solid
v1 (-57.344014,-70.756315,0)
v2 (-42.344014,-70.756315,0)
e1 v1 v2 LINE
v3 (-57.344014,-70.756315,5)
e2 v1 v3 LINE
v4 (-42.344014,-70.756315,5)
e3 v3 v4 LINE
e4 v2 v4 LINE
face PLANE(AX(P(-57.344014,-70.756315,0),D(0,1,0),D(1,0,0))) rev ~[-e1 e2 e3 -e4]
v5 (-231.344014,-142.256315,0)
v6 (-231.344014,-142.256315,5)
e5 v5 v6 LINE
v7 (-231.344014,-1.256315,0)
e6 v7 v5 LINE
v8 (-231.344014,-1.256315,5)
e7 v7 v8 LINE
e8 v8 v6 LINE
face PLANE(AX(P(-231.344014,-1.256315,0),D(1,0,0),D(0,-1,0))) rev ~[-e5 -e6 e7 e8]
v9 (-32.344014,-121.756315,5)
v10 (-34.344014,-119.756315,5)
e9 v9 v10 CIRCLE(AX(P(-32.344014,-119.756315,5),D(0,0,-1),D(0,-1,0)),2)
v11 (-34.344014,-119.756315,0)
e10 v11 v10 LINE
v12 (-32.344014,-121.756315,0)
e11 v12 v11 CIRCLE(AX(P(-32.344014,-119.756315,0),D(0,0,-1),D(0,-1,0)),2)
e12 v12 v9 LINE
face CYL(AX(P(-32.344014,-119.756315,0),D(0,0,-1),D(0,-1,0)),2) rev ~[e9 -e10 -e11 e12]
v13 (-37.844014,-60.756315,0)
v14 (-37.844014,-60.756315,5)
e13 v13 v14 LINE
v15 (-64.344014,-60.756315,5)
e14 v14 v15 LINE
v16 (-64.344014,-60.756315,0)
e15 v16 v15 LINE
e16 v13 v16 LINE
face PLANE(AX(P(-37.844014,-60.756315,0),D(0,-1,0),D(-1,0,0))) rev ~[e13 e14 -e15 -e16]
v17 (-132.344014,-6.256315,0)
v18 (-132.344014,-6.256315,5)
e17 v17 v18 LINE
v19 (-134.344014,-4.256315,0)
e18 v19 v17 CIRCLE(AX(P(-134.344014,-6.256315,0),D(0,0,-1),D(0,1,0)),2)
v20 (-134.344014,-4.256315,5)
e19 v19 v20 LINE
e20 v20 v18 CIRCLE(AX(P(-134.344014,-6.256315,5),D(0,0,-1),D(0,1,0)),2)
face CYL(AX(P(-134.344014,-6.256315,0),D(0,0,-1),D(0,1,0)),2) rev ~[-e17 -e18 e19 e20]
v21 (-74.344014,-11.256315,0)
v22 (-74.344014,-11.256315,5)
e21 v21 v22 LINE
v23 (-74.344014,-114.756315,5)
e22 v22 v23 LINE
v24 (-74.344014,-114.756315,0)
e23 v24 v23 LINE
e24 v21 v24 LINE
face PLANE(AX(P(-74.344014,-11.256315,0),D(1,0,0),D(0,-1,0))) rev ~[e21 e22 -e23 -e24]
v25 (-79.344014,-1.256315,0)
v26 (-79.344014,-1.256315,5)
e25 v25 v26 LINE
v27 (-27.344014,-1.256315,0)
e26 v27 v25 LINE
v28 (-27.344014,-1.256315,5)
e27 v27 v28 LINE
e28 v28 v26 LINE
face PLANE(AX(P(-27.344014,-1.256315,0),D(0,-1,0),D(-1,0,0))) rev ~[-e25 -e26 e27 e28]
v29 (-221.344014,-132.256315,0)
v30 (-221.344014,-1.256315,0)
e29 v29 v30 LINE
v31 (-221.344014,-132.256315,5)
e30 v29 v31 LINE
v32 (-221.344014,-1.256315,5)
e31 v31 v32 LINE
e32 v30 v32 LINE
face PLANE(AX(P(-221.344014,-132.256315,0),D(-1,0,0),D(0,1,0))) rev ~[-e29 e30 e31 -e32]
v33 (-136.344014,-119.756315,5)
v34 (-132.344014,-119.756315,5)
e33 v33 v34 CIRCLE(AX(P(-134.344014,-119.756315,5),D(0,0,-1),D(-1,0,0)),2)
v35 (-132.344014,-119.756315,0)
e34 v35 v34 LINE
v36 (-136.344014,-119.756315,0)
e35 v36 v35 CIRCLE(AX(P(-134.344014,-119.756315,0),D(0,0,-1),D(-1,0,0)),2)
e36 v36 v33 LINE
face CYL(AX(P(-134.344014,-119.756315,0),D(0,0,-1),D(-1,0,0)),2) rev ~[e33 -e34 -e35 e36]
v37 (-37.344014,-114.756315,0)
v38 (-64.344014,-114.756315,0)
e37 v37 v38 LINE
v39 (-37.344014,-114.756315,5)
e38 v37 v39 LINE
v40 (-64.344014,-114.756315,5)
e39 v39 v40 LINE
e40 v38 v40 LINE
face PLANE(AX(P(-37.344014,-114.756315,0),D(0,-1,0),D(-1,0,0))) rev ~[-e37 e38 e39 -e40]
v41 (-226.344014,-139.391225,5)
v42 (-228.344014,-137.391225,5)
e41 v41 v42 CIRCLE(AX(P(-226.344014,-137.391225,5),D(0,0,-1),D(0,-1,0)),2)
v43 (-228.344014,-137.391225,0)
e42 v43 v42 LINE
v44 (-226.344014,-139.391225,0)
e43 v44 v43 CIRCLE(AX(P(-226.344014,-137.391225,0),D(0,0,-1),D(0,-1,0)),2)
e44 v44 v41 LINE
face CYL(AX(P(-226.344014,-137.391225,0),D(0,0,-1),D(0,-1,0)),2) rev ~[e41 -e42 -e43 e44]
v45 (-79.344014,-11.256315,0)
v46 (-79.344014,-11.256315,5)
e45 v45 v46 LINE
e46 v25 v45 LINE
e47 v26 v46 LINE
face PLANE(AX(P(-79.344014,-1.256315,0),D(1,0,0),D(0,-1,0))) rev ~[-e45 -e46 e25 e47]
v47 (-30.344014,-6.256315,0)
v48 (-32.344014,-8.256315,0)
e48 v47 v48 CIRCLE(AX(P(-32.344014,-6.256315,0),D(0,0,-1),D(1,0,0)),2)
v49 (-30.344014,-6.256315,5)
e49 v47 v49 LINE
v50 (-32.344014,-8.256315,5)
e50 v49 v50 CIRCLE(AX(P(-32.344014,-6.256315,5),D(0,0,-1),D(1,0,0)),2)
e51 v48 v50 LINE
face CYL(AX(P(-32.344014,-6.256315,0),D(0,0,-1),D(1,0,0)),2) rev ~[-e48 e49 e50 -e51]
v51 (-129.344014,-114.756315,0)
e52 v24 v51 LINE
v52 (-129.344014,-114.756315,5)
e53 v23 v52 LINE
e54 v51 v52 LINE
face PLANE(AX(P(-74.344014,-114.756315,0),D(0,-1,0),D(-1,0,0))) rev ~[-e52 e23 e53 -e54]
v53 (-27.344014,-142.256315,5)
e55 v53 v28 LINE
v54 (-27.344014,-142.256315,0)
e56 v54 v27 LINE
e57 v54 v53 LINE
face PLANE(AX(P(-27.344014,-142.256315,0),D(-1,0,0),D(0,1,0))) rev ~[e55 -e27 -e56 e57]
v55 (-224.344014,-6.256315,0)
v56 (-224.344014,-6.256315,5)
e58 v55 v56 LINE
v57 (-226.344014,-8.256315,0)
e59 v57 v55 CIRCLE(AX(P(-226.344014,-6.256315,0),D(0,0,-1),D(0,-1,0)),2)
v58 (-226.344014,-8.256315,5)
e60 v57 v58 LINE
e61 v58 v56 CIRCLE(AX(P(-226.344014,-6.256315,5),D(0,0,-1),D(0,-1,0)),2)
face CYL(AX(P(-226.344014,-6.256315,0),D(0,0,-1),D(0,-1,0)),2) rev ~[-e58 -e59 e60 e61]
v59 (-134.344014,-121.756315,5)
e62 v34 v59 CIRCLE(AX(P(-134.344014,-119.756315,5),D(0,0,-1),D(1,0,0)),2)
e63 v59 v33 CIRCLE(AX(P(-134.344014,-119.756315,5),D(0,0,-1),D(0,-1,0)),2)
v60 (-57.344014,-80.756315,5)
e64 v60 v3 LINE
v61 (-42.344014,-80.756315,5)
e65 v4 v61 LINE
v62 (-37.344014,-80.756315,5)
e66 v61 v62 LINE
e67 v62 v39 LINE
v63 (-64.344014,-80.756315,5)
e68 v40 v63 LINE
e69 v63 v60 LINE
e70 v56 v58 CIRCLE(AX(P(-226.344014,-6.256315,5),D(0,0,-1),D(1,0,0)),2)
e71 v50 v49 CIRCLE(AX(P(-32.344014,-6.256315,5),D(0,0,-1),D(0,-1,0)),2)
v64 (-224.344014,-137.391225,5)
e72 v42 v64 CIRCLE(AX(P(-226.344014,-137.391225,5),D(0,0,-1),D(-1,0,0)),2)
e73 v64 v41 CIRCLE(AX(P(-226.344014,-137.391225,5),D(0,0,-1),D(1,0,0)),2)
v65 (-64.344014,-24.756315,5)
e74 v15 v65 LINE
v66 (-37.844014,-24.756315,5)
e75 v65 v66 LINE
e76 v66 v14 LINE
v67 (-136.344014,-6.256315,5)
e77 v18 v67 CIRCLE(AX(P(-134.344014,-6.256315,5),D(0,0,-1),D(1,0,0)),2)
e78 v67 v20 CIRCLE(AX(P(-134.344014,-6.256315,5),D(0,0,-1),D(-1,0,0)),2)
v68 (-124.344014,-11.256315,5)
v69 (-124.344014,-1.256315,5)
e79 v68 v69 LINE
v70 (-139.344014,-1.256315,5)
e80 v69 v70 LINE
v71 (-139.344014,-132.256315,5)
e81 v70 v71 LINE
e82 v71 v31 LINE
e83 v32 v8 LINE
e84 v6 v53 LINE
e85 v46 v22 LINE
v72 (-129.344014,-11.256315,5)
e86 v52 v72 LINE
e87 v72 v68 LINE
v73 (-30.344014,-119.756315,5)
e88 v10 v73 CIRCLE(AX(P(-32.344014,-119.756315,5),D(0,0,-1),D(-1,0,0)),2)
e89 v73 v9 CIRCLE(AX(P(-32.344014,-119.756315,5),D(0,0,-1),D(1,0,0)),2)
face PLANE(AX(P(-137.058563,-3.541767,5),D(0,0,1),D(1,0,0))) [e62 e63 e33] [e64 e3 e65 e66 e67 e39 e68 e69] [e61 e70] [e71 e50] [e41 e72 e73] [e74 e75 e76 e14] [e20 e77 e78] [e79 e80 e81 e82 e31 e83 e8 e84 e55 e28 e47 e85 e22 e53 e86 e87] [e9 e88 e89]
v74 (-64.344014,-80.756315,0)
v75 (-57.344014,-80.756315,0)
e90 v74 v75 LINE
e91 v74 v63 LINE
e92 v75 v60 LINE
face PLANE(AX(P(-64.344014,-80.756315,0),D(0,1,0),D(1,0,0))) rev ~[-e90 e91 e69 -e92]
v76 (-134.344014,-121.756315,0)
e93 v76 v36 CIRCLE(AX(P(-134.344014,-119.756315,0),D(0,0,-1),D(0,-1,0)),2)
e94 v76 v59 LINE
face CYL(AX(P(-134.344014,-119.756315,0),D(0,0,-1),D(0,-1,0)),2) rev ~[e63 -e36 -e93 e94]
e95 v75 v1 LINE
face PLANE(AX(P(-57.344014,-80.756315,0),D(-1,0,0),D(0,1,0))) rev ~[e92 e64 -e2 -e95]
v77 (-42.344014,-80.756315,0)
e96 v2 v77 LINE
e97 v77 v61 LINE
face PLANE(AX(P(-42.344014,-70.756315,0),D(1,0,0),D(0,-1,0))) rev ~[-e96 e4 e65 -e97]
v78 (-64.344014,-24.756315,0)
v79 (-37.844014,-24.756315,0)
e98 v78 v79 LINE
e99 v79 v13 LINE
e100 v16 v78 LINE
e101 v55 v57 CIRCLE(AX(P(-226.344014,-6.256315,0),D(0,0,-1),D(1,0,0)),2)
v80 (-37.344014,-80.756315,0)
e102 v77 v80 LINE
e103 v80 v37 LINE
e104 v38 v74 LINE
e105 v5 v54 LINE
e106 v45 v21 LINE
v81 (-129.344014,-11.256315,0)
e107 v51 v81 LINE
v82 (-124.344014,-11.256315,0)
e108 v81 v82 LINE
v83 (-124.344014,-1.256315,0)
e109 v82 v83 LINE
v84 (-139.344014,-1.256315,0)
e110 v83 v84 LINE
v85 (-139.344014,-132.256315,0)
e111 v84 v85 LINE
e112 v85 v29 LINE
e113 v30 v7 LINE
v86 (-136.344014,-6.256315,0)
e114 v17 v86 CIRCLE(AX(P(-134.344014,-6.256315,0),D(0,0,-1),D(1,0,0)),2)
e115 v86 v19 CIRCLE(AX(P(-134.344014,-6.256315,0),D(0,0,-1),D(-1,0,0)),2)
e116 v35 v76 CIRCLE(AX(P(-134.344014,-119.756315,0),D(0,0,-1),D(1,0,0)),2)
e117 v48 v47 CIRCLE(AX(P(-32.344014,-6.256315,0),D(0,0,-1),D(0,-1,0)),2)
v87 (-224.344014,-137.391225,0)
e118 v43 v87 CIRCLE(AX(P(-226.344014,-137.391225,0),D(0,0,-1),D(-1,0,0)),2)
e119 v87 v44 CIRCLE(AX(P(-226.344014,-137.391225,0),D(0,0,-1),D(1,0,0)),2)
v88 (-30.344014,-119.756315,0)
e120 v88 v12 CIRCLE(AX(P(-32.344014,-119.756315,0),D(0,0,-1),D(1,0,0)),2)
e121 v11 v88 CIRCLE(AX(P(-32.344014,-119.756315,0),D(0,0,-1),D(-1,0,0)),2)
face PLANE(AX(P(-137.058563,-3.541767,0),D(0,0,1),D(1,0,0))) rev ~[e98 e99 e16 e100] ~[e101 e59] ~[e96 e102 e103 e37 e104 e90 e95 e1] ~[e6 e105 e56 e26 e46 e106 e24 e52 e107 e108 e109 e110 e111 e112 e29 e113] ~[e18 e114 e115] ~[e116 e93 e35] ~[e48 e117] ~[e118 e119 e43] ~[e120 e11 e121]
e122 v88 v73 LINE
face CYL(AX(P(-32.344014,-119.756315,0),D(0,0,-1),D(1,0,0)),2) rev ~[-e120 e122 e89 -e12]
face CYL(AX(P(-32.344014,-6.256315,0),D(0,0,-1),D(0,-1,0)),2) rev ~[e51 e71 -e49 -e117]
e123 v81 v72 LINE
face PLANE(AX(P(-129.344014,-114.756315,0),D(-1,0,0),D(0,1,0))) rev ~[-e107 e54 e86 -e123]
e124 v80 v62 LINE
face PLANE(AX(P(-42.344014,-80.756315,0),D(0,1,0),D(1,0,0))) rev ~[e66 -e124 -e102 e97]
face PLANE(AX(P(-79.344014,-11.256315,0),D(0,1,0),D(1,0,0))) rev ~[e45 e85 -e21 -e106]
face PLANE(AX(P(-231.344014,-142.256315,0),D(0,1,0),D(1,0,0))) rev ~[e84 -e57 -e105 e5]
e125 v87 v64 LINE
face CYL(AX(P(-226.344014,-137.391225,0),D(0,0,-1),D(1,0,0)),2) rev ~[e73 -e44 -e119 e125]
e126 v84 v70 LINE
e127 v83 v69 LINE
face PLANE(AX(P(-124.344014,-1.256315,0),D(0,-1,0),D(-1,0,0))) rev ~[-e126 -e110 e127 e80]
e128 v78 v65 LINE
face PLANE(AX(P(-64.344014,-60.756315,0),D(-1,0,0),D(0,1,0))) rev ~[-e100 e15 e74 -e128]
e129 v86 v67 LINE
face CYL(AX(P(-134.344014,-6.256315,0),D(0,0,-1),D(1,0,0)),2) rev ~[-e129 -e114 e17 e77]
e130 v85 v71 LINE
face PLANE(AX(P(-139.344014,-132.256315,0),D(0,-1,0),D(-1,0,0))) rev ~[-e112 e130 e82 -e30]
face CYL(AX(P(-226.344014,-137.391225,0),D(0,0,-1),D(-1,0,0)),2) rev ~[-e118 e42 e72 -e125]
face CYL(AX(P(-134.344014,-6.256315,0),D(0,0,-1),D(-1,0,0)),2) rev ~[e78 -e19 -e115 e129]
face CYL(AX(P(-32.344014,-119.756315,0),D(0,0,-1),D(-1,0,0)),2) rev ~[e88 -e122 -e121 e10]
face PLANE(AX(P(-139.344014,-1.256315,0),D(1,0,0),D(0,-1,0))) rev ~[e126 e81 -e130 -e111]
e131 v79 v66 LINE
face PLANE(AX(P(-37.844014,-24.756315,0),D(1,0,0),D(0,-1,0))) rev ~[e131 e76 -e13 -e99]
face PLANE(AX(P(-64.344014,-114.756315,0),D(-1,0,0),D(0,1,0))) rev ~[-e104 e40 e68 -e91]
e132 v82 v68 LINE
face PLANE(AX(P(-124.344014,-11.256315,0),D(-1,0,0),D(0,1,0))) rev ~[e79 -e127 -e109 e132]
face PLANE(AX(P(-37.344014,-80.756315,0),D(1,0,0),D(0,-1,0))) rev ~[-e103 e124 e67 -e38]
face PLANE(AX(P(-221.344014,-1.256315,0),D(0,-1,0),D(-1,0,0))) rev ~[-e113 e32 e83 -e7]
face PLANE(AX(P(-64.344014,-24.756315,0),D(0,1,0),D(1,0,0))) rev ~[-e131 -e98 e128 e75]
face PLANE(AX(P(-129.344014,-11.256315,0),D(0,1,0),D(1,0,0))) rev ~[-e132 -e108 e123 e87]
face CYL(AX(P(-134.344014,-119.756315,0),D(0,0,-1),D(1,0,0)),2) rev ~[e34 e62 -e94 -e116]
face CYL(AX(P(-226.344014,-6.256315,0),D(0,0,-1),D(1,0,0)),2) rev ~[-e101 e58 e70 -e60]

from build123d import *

# Parameters (mm, degrees)
F1_DEPTH = 5


# Not quite as in the source:
# - a feature names something its author has since deleted; it is built from what else it names


with BuildPart() as f1:
    # F0 (on Top) → F1 (new body)
    with BuildSketch(Plane.XY):
        with BuildLine():
            Line((-134.3440142274, -1.256315279), (-139.3440142274, -1.256315279))
            Line((-139.3440142274, -1.256315279), (-139.3440142274, -6.256315279))
            Line((-139.3440142274, -6.256315279), (-136.3440142274, -6.256315279))
            ThreePointArc((-136.3440142274, -6.256315279), (-135.7582277898, -4.8421017166), (-134.3440142274, -4.256315279))
            Line((-134.3440142274, -4.256315279), (-134.3440142274, -1.256315279))
        make_face()
        with BuildLine():
            Line((-129.3440142274, -1.256315279), (-134.3440142274, -1.256315279))
            Line((-134.3440142274, -1.256315279), (-134.3440142274, -4.256315279))
            ThreePointArc((-134.3440142274, -4.256315279), (-132.929800665, -4.8421017166), (-132.3440142274, -6.256315279))
            ThreePointArc((-132.3440142274, -6.256315279), (-134.3440142274, -8.256315279), (-136.3440142274, -6.256315279))
            Line((-136.3440142274, -6.256315279), (-139.3440142274, -6.256315279))
            Line((-139.3440142274, -6.256315279), (-139.3440142274, -11.256315279))
            Line((-139.3440142274, -11.256315279), (-129.3440142274, -11.256315279))
            Line((-129.3440142274, -11.256315279), (-129.3440142274, -1.256315279))
        make_face()
        with BuildLine():
            Line((-221.3440142274, -6.256315279), (-221.3440142274, -1.256315279))
            Line((-221.3440142274, -1.256315279), (-231.3440142274, -1.256315279))
            Line((-231.3440142274, -1.256315279), (-231.3440142274, -132.256315279))
            Line((-231.3440142274, -132.256315279), (-221.3440142274, -132.256315279))
            Line((-221.3440142274, -132.256315279), (-221.3440142274, -128.856315279))
            Line((-221.3440142274, -128.856315279), (-221.3440142274, -14.656315279))
            Line((-221.3440142274, -14.656315279), (-221.3440142274, -11.256315279))
            Line((-221.3440142274, -11.256315279), (-226.3440142274, -11.256315279))
            Line((-226.3440142274, -11.256315279), (-226.3440142274, -8.256315279))
            ThreePointArc((-226.3440142274, -8.256315279), (-227.7582277898, -4.8421017166), (-224.3440142274, -6.256315279))
            Line((-224.3440142274, -6.256315279), (-221.3440142274, -6.256315279))
        make_face()
        Polygon((-124.3440142274, -1.256315279), (-129.3440142274, -1.256315279), (-129.3440142274, -11.256315279), (-126.5440142274, -11.256315279), (-126.3440142274, -11.256315279), (-124.3440142274, -11.256315279), align=None)
        Polygon((-129.3440142274, -11.256315279), (-139.3440142274, -11.256315279), (-139.3440142274, -14.656315279), (-139.3440142274, -114.756315279), (-129.3440142274, -114.756315279), (-129.3440142274, -111.756315279), (-129.3440142274, -108.756315279), (-129.3440142274, -27.956315279), (-129.3440142274, -27.456315279), (-129.3440142274, -14.056315279), align=None)
        with BuildLine():
            Line((-221.3440142274, -11.256315279), (-221.3440142274, -6.256315279))
            Line((-221.3440142274, -6.256315279), (-224.3440142274, -6.256315279))
            ThreePointArc((-224.3440142274, -6.256315279), (-224.929800665, -7.6705288414), (-226.3440142274, -8.256315279))
            Line((-226.3440142274, -8.256315279), (-226.3440142274, -11.256315279))
            Line((-226.3440142274, -11.256315279), (-221.3440142274, -11.256315279))
        make_face()
        with BuildLine():
            Line((-221.3440142274, -132.256315279), (-231.3440142274, -132.256315279))
            Line((-231.3440142274, -132.256315279), (-231.3440142274, -137.3912245035))
            Line((-231.3440142274, -137.3912245035), (-228.3440142274, -137.3912245035))
            ThreePointArc((-228.3440142274, -137.3912245035), (-226.3440142274, -135.3912245035), (-224.3440142274, -137.3912245035))
            ThreePointArc((-224.3440142274, -137.3912245035), (-224.929800665, -138.8054380659), (-226.3440142274, -139.3912245035))
            Line((-226.3440142274, -139.3912245035), (-226.3440142274, -142.256315279))
            Line((-226.3440142274, -142.256315279), (-221.3440142274, -142.256315279))
            Line((-221.3440142274, -142.256315279), (-221.3440142274, -132.256315279))
        make_face()
        with BuildLine():
            Line((-129.3440142274, -114.756315279), (-139.3440142274, -114.756315279))
            Line((-139.3440142274, -114.756315279), (-139.3440142274, -119.756315279))
            Line((-139.3440142274, -119.756315279), (-136.3440142274, -119.756315279))
            ThreePointArc((-136.3440142274, -119.756315279), (-134.3440142274, -117.756315279), (-132.3440142274, -119.756315279))
            ThreePointArc((-132.3440142274, -119.756315279), (-132.929800665, -121.1705288414), (-134.3440142274, -121.756315279))
            Line((-134.3440142274, -121.756315279), (-134.3440142274, -124.756315279))
            Line((-134.3440142274, -124.756315279), (-129.3440142274, -124.756315279))
            Line((-129.3440142274, -124.756315279), (-129.3440142274, -114.756315279))
        make_face()
        Polygon((-217.9440142274, -132.256315279), (-221.3440142274, -132.256315279), (-221.3440142274, -142.256315279), (-139.3440142274, -142.256315279), (-139.4949736476, -132.256315279), (-142.7440142274, -132.256315279), (-147.4240142274, -132.256315279), (-151.4240142274, -132.256315279), align=None)
        with BuildLine():
            Line((-228.3440142274, -137.3912245035), (-231.3440142274, -137.3912245035))
            Line((-231.3440142274, -137.3912245035), (-231.3440142274, -142.256315279))
            Line((-231.3440142274, -142.256315279), (-226.3440142274, -142.256315279))
            Line((-226.3440142274, -142.256315279), (-226.3440142274, -139.3912245035))
            ThreePointArc((-226.3440142274, -139.3912245035), (-227.7582277898, -138.8054380659), (-228.3440142274, -137.3912245035))
        make_face()
        with BuildLine():
            Line((-79.3440142274, -1.256315279), (-79.3440142274, -11.256315279))
            Line((-79.3440142274, -11.256315279), (-77.3440142274, -11.256315279))
            Line((-77.3440142274, -11.256315279), (-74.3440142274, -11.256315279))
            Line((-74.3440142274, -11.256315279), (-32.3440142274, -11.256315279))
            Line((-32.3440142274, -11.256315279), (-32.3440142274, -8.256315279))
            ThreePointArc((-32.3440142274, -8.256315279), (-33.7582277898, -4.8421017166), (-30.3440142274, -6.256315279))
            Line((-30.3440142274, -6.256315279), (-27.3440142274, -6.256315279))
            Line((-27.3440142274, -6.256315279), (-27.3440142274, -1.256315279))
            Line((-27.3440142274, -1.256315279), (-79.3440142274, -1.256315279))
        make_face()
        Polygon((-126.3440142274, -114.756315279), (-129.3440142274, -114.756315279), (-129.3440142274, -124.756315279), (-74.3440142274, -124.756315279), (-74.3440142274, -114.756315279), (-77.1940142274, -114.756315279), (-77.3440142274, -114.756315279), align=None)
        with BuildLine():
            Line((-136.3440142274, -119.756315279), (-139.3440142274, -119.756315279))
            Line((-139.3440142274, -119.756315279), (-139.3440142274, -124.756315279))
            Line((-139.3440142274, -124.756315279), (-139.1930548072, -124.756315279))
            Line((-139.1930548072, -124.756315279), (-134.3440142274, -124.756315279))
            Line((-134.3440142274, -124.756315279), (-134.3440142274, -121.756315279))
            ThreePointArc((-134.3440142274, -121.756315279), (-135.7582277898, -121.1705288414), (-136.3440142274, -119.756315279))
        make_face()
        Polygon((-139.3440142274, -132.256315279), (-139.4949736476, -132.256315279), (-139.3440142274, -142.256315279), (-129.3440142274, -142.256315279), (-129.3440142274, -124.756315279), (-134.3440142274, -124.756315279), (-139.1930548072, -124.756315279), (-139.3440142274, -124.756315279), (-139.3440142274, -128.856315279), align=None)
        Polygon((-74.3440142274, -124.756315279), (-129.3440142274, -124.756315279), (-129.3440142274, -142.256315279), (-77.3440142274, -142.256315279), (-74.3440142274, -142.256315279), align=None)
        Polygon((-32.3440142274, -11.256315279), (-74.3440142274, -11.256315279), (-74.3440142274, -14.256315279), (-74.3440142274, -26.056315279), (-74.3440142274, -103.156315279), (-74.3440142274, -111.906315279), (-74.3440142274, -114.756315279), (-64.3440142274, -114.756315279), (-64.3440142274, -105.506315279), (-64.3440142274, -82.706315279), (-64.3440142274, -80.756315279), (-64.3440142274, -60.756315279), (-64.3440142274, -59.006315279), (-64.3440142274, -26.456315279), (-64.3440142274, -24.756315279), (-62.6440142274, -24.756315279), (-39.5440142274, -24.756315279), (-37.8440142274, -24.756315279), (-27.3440142274, -24.756315279), (-27.3440142274, -14.656315279), (-27.3440142274, -11.256315279), align=None)
        with BuildLine():
            Line((-27.3440142274, -11.256315279), (-27.3440142274, -6.256315279))
            Line((-27.3440142274, -6.256315279), (-30.3440142274, -6.256315279))
            ThreePointArc((-30.3440142274, -6.256315279), (-30.929800665, -7.6705288414), (-32.3440142274, -8.256315279))
            Line((-32.3440142274, -8.256315279), (-32.3440142274, -11.256315279))
            Line((-32.3440142274, -11.256315279), (-27.3440142274, -11.256315279))
        make_face()
        Polygon((-74.3440142274, -114.756315279), (-74.3440142274, -124.756315279), (-37.3440142274, -124.756315279), (-37.3440142274, -119.756315279), (-37.3440142274, -114.756315279), (-39.2940142274, -114.756315279), (-62.3940142274, -114.756315279), (-64.3440142274, -114.756315279), align=None)
        Polygon((-37.3440142274, -124.756315279), (-74.3440142274, -124.756315279), (-74.3440142274, -142.256315279), (-27.3440142274, -142.256315279), (-27.3440142274, -124.756315279), (-32.3440142274, -124.756315279), align=None)
        with BuildLine():
            Line((-37.3440142274, -119.756315279), (-37.3440142274, -124.756315279))
            Line((-37.3440142274, -124.756315279), (-32.3440142274, -124.756315279))
            Line((-32.3440142274, -124.756315279), (-32.3440142274, -121.756315279))
            ThreePointArc((-32.3440142274, -121.756315279), (-33.7582277898, -121.1705288414), (-34.3440142274, -119.756315279))
            Line((-34.3440142274, -119.756315279), (-37.3440142274, -119.756315279))
        make_face()
        with BuildLine():
            Line((-32.3440142274, -121.756315279), (-32.3440142274, -124.756315279))
            Line((-32.3440142274, -124.756315279), (-27.3440142274, -124.756315279))
            Line((-27.3440142274, -124.756315279), (-27.3440142274, -114.756315279))
            Line((-27.3440142274, -114.756315279), (-37.3440142274, -114.756315279))
            Line((-37.3440142274, -114.756315279), (-37.3440142274, -119.756315279))
            Line((-37.3440142274, -119.756315279), (-34.3440142274, -119.756315279))
            ThreePointArc((-34.3440142274, -119.756315279), (-32.3440142274, -117.756315279), (-30.3440142274, -119.756315279))
            ThreePointArc((-30.3440142274, -119.756315279), (-30.929800665, -121.1705288414), (-32.3440142274, -121.756315279))
        make_face()
        Polygon((-27.3440142274, -114.756315279), (-27.3440142274, -24.756315279), (-37.8440142274, -24.756315279), (-37.8440142274, -26.456315279), (-37.8440142274, -59.006315279), (-37.8440142274, -60.756315279), (-39.5940142274, -60.756315279), (-62.5940142274, -60.756315279), (-64.3440142274, -60.756315279), (-64.3440142274, -80.756315279), (-62.3940142274, -80.756315279), (-57.3440142274, -80.756315279), (-57.3440142274, -70.756315279), (-42.3440142274, -70.756315279), (-42.3440142274, -80.756315279), (-39.2940142274, -80.756315279), (-37.3440142274, -80.756315279), (-37.3440142274, -82.706315279), (-37.3440142274, -105.506315279), (-37.3440142274, -114.756315279), align=None)
    extrude(amount=F1_DEPTH)


solid = f1.part
